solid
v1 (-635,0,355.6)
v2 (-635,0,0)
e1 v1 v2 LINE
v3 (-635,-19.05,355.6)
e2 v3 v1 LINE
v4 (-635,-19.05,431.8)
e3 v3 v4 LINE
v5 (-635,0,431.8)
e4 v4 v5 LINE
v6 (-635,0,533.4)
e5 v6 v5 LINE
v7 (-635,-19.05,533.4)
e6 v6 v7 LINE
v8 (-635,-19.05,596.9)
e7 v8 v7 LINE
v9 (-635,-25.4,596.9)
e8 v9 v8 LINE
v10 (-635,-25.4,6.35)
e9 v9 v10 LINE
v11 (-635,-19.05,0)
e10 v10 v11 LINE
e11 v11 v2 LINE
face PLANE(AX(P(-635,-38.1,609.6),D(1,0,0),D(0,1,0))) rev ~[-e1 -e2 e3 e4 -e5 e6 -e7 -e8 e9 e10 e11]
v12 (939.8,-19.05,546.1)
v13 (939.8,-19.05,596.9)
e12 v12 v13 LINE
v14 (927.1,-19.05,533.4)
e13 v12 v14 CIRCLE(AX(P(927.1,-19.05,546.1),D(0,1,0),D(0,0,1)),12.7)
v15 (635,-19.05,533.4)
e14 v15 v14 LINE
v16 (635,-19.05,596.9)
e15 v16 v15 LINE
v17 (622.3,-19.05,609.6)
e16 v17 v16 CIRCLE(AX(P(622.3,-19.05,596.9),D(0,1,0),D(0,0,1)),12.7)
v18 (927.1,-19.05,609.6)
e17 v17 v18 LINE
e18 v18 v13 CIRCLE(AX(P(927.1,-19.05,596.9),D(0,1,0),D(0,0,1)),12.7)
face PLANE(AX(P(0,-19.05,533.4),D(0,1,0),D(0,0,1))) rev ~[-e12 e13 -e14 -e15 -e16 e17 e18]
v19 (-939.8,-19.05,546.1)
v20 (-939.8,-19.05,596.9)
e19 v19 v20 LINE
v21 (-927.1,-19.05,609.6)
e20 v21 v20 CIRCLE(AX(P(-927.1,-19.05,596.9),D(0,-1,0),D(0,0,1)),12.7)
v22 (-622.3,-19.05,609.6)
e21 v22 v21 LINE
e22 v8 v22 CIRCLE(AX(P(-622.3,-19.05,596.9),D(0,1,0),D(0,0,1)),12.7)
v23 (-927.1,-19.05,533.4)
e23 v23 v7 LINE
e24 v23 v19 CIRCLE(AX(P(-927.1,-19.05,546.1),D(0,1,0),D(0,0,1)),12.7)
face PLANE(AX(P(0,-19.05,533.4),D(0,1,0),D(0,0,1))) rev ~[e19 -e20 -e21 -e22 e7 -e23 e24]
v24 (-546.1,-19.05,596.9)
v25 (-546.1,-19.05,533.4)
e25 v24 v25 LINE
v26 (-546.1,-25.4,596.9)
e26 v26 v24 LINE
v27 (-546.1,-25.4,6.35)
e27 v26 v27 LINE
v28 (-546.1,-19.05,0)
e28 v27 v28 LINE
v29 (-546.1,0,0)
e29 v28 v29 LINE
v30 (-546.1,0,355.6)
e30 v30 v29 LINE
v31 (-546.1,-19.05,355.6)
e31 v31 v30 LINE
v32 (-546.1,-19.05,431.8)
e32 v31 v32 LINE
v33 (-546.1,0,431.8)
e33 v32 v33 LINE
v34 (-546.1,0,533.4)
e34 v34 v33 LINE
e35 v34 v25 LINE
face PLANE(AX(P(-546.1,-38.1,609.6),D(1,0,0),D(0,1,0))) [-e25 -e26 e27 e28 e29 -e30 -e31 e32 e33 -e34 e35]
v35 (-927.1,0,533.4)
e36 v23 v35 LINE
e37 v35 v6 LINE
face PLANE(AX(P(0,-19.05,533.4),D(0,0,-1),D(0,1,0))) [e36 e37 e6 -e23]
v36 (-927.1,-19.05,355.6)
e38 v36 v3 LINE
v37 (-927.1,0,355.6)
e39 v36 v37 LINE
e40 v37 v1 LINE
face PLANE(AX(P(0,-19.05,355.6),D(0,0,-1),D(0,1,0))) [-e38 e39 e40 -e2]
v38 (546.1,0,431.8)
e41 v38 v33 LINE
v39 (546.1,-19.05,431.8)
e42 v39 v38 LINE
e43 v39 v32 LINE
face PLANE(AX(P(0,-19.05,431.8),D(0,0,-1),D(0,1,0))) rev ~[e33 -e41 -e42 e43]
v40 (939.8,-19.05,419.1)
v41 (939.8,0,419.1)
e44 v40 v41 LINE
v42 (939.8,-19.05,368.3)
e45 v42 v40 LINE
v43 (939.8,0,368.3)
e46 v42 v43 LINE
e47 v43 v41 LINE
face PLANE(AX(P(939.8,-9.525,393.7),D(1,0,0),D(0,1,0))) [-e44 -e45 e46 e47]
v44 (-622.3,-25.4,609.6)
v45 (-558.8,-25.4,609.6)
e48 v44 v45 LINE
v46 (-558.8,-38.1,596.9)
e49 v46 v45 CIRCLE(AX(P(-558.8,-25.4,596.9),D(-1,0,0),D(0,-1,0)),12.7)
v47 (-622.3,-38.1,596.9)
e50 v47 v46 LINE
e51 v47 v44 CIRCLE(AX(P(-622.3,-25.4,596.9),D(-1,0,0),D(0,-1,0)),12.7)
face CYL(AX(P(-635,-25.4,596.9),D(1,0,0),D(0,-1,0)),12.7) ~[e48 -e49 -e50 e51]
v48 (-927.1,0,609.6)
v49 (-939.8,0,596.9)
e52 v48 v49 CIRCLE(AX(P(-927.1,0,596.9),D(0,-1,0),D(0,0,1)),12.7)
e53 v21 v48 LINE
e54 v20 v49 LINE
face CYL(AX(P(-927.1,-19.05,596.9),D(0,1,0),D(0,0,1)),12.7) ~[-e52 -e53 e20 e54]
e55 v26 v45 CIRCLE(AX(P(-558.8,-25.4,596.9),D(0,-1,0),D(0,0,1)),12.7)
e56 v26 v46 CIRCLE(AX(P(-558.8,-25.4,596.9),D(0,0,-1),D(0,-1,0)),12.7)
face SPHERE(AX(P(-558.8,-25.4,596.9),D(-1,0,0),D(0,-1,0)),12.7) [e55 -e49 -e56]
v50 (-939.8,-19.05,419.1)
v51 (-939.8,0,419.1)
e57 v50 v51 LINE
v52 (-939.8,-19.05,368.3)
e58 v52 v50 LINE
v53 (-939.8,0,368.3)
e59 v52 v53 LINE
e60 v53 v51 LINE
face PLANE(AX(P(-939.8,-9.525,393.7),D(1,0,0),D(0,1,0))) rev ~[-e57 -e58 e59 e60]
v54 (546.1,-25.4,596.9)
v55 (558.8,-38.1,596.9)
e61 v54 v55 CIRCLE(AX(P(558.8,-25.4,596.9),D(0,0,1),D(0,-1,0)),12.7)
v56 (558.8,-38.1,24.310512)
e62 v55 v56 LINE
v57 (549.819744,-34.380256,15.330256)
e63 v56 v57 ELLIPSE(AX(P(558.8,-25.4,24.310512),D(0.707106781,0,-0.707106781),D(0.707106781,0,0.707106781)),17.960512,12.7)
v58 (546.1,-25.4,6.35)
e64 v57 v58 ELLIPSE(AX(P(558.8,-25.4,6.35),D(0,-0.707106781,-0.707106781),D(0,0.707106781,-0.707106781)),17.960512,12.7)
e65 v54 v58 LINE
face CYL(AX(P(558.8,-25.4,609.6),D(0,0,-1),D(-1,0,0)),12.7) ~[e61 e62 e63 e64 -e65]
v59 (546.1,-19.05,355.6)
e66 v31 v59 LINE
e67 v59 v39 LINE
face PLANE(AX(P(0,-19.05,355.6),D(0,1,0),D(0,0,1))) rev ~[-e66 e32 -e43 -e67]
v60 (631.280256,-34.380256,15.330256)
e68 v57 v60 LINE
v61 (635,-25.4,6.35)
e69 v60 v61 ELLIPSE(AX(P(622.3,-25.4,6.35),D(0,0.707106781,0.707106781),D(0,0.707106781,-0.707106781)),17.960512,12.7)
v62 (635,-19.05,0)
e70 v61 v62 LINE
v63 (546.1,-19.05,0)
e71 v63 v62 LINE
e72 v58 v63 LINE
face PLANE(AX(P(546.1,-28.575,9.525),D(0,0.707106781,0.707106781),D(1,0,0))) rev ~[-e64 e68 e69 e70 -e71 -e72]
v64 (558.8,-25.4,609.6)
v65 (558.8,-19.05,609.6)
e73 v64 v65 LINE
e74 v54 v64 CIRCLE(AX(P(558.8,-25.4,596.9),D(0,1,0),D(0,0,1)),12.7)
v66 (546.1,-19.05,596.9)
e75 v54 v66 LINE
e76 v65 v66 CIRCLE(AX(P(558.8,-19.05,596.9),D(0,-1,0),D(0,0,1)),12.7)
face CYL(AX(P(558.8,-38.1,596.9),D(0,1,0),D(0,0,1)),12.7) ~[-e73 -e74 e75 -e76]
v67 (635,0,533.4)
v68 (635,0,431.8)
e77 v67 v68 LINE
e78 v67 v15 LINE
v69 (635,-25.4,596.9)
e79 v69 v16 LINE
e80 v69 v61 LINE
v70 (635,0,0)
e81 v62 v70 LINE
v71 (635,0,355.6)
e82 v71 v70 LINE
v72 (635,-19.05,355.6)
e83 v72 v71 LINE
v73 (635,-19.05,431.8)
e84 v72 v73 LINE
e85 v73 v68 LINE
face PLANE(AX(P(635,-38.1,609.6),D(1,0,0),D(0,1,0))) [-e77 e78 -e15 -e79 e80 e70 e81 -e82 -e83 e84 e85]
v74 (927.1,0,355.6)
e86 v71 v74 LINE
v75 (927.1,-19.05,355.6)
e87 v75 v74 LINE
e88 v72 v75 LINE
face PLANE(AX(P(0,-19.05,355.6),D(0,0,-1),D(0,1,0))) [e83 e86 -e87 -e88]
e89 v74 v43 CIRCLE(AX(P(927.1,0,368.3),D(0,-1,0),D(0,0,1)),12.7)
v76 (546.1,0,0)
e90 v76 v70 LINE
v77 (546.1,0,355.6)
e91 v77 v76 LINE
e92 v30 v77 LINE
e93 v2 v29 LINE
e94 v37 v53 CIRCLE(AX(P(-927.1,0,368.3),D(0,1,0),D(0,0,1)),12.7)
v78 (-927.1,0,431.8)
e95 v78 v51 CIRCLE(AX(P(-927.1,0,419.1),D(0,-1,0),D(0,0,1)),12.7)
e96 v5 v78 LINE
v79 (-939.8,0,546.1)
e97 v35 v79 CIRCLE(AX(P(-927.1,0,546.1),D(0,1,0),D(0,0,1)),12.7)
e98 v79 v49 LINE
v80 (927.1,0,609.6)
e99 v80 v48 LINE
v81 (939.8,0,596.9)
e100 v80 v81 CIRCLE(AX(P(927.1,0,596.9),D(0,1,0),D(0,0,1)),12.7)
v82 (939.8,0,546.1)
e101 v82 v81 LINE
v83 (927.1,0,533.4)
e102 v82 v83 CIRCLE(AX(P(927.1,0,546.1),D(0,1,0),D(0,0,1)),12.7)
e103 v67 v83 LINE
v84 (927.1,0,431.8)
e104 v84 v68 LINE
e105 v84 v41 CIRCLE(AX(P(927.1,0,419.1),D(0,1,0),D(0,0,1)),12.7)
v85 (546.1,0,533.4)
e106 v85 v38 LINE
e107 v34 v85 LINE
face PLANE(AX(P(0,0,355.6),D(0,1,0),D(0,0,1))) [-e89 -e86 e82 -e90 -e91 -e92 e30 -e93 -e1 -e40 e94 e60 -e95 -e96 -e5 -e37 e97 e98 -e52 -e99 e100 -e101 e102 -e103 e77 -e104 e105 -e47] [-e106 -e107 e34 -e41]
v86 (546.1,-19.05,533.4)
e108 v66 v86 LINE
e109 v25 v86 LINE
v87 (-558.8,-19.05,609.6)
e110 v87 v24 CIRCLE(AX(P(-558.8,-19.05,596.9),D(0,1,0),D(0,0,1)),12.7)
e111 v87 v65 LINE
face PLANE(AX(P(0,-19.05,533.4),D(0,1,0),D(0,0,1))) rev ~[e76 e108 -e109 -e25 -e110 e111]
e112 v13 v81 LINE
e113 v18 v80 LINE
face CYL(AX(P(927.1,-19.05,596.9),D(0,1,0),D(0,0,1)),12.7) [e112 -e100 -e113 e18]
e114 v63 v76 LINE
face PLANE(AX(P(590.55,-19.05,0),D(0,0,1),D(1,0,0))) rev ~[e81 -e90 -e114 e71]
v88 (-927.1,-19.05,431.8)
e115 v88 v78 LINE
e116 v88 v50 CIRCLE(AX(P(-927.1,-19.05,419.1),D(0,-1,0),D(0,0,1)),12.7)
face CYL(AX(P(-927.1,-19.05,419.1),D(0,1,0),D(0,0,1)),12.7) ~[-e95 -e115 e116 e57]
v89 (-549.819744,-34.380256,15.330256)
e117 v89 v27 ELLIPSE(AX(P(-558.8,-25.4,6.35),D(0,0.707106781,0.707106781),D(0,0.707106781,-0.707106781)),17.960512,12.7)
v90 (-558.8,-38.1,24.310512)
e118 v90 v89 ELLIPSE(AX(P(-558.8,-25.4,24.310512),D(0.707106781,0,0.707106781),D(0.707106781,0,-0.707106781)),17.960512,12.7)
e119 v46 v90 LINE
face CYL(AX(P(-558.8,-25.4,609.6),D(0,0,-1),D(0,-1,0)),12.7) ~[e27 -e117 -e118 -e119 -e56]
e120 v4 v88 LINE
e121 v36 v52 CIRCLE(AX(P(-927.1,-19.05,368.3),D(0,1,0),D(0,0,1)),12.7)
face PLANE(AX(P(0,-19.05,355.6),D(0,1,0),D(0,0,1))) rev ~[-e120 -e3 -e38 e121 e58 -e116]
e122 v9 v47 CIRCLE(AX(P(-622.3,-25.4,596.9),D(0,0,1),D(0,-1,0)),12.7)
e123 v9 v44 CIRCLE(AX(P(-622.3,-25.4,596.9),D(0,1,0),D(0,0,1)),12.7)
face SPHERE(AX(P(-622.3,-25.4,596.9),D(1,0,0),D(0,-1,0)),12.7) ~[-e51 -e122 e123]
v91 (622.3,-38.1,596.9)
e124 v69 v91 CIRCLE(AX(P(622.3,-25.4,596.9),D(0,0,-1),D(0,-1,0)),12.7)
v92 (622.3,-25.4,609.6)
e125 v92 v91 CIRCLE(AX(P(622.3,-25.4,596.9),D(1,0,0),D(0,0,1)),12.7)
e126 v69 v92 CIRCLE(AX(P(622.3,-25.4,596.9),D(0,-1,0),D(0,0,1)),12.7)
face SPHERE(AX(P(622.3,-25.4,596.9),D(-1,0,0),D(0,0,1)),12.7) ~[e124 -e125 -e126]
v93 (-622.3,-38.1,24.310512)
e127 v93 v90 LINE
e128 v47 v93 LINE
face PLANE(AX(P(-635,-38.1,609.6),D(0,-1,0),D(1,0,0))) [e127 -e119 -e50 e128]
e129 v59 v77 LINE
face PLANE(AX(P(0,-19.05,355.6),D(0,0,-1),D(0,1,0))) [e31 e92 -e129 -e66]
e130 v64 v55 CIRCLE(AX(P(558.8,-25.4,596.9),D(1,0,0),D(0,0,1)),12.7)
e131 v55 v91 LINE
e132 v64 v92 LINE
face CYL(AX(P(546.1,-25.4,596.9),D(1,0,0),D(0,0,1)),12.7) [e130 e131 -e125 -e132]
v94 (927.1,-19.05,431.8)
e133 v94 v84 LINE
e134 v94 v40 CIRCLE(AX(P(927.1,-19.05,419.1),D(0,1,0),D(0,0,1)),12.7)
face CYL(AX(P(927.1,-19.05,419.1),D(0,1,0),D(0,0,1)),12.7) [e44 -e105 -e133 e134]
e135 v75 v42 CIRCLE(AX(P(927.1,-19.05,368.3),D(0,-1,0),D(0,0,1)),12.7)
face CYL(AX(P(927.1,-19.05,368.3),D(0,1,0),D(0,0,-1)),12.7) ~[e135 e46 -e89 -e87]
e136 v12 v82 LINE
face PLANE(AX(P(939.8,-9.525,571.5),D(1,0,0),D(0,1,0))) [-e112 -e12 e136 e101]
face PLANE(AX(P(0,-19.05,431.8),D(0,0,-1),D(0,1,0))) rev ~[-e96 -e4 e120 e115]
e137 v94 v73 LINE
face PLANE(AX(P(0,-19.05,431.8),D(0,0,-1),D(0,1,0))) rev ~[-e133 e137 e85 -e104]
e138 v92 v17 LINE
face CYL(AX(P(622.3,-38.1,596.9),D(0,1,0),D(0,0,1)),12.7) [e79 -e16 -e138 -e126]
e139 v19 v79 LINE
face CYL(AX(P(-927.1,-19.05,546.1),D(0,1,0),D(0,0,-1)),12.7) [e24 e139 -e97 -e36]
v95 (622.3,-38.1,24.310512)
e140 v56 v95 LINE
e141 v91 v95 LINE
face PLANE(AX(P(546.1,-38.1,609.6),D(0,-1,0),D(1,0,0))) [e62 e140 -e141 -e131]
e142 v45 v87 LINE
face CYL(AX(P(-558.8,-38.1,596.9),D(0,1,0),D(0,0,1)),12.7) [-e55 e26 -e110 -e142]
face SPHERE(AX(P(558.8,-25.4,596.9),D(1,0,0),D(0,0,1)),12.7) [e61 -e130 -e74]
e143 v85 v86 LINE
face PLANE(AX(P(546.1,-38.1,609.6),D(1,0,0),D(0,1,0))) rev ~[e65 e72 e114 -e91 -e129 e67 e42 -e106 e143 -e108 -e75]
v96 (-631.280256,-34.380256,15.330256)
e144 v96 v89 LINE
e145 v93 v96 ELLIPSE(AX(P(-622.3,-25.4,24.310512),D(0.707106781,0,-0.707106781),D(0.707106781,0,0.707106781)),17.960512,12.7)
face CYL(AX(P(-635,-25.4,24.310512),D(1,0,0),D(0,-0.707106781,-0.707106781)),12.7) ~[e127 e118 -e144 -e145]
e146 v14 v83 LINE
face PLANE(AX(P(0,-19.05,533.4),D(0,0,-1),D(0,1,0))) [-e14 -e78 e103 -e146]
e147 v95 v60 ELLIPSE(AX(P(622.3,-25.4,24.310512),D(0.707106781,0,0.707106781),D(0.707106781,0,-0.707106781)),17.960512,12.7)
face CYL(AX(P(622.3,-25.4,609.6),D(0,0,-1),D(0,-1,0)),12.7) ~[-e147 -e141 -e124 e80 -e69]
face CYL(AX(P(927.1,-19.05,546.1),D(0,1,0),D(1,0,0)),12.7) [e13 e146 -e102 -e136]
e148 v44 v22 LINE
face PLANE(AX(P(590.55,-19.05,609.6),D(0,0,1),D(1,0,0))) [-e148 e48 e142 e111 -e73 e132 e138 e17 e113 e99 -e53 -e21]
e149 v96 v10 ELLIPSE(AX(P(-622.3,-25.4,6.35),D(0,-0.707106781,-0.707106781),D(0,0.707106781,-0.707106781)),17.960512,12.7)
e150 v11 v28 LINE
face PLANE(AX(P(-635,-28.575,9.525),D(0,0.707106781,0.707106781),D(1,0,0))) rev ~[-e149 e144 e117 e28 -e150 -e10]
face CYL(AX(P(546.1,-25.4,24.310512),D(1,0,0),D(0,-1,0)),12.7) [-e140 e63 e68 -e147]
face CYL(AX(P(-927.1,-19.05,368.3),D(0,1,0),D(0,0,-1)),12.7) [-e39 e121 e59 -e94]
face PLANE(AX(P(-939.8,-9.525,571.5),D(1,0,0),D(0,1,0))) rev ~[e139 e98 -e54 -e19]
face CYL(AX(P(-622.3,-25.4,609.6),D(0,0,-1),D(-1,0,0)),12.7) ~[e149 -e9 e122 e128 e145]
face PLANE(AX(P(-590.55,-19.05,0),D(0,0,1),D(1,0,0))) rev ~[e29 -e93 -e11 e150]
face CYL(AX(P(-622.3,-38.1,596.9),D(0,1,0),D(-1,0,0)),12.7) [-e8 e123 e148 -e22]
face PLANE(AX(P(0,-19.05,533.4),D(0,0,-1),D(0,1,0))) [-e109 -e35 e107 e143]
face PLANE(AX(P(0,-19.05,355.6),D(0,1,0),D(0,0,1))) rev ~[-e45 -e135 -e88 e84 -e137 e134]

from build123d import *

# Parameters (mm, degrees)
F0_W     = 19.05
F0_H     = 76.2
F1_DEPTH = 939.8
F2_W     = 88.9
F2_H     = 38.1
F3_DEPTH = 609.6
F4_SIZE  = 19.05
F5_W     = 19.05
F5_H     = 76.2
F6_DEPTH = 939.8
F7_R     = 12.7


with BuildPart() as f1:
    # F0 (on Right) → F1 (new body, symmetric)
    with BuildSketch(Plane.YZ):
        with Locations((-9.525, 571.5)):
            Rectangle(F0_W, F0_H)
    extrude(amount=F1_DEPTH, both=True)

    # F2 (on face) → F3 (join, through all)
    with BuildSketch(Plane.XY.offset(609.6)):
        with Locations((590.55, -19.05)):
            Rectangle(F2_W, F2_H)
        with Locations((-590.55, -19.05)):
            Rectangle(F2_W, F2_H)
    extrude(amount=-F3_DEPTH)

    # F4
    f4_edges = [f1.edges().sort_by_distance(p)[0] for p in [
        (590.55, -38.1, 0),
        (-590.55, -38.1, 0),
    ]]
    chamfer(f4_edges, length=F4_SIZE)

    # F5 (on Right) → F6 (join, symmetric)
    with BuildSketch(Plane.YZ):
        with Locations((-9.525, 393.7)):
            Rectangle(F5_W, F5_H)
    extrude(amount=F6_DEPTH, both=True)

    # F7
    f7_edges = [f1.edges().sort_by_distance(p)[0] for p in [
        (939.8, -9.525, 609.6),
        (939.8, -9.525, 533.4),
        (590.55, -38.1, 609.6),
        (635, -28.575, 609.6),
        (546.1, -28.575, 609.6),
        (635, -38.1, 314.325),
        (546.1, -38.1, 314.325),
        (-590.55, -38.1, 609.6),
        (-546.1, -38.1, 314.325),
        (-635, -38.1, 314.325),
        (-635, -28.575, 609.6),
        (-939.8, -9.525, 609.6),
        (-939.8, -9.525, 533.4),
        (-546.1, -28.575, 609.6),
        (-590.55, -38.1, 19.05),
        (590.55, -38.1, 19.05),
        (939.8, -9.525, 431.8),
        (939.8, -9.525, 355.6),
        (-939.8, -9.525, 431.8),
        (-939.8, -9.525, 355.6),
    ]]
    fillet(f7_edges, radius=F7_R)


solid = f1.part
